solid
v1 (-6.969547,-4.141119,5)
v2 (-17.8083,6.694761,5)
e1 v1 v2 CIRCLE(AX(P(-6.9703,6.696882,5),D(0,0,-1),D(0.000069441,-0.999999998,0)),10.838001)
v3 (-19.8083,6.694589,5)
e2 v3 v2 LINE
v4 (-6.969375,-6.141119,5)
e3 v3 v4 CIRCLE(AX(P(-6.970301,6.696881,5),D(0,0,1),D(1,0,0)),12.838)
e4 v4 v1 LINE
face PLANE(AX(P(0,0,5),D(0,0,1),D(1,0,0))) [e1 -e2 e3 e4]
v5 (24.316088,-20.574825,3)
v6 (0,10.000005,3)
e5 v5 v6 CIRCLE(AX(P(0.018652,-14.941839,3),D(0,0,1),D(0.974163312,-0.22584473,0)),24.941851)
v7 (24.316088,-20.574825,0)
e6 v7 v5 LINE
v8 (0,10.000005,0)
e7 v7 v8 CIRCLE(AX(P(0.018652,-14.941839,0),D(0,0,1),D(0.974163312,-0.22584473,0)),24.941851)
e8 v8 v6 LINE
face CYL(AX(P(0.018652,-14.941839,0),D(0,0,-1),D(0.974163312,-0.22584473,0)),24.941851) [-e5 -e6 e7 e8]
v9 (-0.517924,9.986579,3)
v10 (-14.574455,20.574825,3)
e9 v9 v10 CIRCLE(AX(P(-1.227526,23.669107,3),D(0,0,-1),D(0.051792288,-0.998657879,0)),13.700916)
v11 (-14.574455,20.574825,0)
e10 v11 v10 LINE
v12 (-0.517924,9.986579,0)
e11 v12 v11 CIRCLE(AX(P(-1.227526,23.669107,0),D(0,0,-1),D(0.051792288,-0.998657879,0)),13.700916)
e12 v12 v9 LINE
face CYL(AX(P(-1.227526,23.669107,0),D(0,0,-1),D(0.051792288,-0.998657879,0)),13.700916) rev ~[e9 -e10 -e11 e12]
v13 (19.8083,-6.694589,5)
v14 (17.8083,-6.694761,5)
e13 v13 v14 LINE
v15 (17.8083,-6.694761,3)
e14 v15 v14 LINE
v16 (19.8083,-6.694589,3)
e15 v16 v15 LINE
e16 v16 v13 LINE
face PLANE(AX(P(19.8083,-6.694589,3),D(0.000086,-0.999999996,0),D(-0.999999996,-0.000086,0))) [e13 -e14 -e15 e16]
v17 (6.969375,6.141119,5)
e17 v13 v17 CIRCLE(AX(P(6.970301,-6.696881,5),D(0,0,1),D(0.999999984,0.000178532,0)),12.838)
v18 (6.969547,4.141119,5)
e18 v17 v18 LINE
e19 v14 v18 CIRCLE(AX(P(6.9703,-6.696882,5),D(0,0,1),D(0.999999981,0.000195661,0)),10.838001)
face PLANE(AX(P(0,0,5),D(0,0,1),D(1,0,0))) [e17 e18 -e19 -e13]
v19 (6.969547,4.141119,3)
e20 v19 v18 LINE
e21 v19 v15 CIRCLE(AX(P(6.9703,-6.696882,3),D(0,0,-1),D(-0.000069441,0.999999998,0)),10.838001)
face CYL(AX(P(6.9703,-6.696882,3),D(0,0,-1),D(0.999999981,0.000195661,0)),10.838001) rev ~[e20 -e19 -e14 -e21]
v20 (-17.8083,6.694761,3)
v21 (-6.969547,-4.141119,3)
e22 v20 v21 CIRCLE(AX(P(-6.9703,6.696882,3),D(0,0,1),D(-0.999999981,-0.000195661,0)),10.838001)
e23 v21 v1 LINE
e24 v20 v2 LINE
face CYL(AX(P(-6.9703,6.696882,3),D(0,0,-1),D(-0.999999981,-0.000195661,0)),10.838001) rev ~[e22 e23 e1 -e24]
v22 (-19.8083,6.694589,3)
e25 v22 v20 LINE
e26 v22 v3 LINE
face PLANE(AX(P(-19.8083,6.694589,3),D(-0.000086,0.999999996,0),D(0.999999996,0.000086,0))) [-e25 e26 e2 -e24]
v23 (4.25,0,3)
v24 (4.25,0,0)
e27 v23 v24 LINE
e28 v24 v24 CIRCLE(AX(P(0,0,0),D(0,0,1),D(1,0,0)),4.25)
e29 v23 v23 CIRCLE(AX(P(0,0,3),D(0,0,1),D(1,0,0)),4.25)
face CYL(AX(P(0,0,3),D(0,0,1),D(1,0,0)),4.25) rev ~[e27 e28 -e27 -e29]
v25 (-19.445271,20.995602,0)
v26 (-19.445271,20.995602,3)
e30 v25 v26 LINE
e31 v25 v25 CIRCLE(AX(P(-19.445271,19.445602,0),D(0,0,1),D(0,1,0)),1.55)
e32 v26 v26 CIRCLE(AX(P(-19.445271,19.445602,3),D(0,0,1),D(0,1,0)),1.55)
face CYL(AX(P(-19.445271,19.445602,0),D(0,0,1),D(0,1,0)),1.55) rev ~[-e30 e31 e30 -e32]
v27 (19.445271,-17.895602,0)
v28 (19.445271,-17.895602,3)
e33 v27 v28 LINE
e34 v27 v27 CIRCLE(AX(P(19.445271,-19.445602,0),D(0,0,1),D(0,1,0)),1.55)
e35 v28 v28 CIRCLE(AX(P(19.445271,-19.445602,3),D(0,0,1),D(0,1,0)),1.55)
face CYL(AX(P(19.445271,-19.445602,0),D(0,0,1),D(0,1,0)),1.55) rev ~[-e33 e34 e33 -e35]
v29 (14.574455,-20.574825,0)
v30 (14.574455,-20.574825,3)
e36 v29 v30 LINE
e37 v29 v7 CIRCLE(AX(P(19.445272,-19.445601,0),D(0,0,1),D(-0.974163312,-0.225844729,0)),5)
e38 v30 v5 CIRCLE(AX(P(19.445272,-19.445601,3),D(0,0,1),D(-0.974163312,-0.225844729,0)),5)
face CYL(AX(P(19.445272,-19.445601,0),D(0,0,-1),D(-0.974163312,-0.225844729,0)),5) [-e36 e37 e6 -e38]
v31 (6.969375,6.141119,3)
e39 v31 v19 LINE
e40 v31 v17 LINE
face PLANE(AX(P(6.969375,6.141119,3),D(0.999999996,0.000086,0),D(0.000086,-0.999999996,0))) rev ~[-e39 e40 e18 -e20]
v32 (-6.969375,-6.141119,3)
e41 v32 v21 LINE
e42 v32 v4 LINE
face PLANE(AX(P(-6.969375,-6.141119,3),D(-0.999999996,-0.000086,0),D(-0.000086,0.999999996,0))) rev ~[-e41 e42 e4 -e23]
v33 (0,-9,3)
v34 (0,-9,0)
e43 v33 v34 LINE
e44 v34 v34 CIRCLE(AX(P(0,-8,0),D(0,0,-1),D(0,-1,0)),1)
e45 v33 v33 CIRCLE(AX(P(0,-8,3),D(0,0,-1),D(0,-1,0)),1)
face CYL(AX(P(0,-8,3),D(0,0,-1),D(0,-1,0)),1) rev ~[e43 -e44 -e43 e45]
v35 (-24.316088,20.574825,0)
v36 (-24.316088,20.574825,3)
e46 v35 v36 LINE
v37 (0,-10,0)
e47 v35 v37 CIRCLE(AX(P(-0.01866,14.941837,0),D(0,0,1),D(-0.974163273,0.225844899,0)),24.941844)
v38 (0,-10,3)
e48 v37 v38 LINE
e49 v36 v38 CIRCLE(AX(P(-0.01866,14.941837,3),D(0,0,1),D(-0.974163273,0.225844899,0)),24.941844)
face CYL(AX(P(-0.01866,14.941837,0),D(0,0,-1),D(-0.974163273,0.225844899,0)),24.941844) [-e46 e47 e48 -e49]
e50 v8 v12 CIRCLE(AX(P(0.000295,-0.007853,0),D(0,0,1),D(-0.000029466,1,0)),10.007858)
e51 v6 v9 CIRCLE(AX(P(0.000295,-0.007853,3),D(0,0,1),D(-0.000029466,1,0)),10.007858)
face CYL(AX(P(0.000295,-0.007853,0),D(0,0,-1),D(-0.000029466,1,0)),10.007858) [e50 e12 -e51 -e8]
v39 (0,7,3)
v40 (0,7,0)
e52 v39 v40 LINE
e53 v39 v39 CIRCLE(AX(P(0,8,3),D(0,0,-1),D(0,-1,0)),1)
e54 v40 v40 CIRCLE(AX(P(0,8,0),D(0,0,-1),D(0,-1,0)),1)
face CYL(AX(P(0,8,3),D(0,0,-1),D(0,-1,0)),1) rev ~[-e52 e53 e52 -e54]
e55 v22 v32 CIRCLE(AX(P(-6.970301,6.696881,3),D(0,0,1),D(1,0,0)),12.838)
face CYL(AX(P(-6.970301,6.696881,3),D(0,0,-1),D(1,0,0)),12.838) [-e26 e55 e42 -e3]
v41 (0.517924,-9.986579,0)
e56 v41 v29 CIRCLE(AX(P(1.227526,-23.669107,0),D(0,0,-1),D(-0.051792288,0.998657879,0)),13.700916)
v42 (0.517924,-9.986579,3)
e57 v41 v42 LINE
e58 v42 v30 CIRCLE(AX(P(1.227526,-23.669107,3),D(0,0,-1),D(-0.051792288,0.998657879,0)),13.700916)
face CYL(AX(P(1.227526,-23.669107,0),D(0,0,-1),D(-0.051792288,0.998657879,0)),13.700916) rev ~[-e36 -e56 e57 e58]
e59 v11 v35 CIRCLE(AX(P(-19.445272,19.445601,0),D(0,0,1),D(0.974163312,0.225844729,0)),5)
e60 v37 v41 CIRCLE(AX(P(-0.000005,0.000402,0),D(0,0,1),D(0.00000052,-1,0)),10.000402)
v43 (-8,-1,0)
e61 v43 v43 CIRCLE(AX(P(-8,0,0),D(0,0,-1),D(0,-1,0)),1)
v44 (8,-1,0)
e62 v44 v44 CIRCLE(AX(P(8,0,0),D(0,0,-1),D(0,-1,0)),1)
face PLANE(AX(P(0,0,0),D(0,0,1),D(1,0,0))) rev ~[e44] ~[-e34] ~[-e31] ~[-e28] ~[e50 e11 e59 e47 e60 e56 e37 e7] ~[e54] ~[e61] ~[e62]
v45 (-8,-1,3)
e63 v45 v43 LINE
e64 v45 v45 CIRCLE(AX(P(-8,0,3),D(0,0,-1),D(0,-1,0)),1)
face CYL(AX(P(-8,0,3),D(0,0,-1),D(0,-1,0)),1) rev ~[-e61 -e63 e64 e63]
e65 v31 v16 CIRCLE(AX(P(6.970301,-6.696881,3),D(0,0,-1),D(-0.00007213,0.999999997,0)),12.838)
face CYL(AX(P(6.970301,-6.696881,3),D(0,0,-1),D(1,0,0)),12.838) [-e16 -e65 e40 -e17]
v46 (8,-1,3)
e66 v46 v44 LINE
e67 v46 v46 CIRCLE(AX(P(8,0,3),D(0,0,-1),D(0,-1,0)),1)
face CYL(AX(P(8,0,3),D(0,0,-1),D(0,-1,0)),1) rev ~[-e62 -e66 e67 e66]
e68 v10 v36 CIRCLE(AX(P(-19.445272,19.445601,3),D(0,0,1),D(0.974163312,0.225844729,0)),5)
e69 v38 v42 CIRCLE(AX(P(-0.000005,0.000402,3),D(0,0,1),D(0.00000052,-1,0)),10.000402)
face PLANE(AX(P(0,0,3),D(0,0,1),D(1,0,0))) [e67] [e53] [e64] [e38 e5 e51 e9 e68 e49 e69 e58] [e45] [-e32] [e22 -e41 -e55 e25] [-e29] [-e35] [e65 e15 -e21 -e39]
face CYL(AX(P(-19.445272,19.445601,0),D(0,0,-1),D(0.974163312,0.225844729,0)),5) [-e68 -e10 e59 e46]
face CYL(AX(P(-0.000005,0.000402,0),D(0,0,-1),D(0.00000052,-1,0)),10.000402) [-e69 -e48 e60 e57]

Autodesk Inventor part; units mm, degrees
ref_plane "YZ Plane" through (0, 0, 0) normal (1, 0, 0) x (0, 1, 0)
ref_plane "XZ Plane" through (0, 0, 0) normal (0, 1, 0) x (-1, 0, 0)
ref_plane "XY Plane" through (0, 0, 0) normal (0, 0, 1) x (1, 0, 0)
sketch "スケッチ1" plane through (0, 0, 0) normal (0, 0, 1) x (1, 0, 0)
  circle A0 centre (0, 0) radius 27.5
  line L0 (0, 27.5) -> (0, 0)
  line L1 (8, 0) -> (19.445271, -19.445602)
  line L2 (0, 0) -> (27.5, 0)
  circle A1 centre (19.445271, -19.445602) radius 5
  circle A2 centre (0, 0) radius 10
  arc A3 (24.316088, -20.574825) -> (0, 10.000005) centre (0.018653, -14.941839) ccw
  line L3 (24.316088, -20.574825) -> (14.574455, -20.574825)
  arc A4 (14.574455, -20.574825) -> (0.517924, -9.986579) centre (1.227526, -23.669106) ccw
  arc A5 (-24.316088, 20.574825) -> (0, -10.000005) centre (-0.018653, 14.941839) ccw
  arc A6 (-14.574455, 20.574825) -> (-0.517924, 9.986579) centre (-1.227526, 23.669106) ccw
  circle A7 centre (-19.445271, 19.445602) radius 5
  point P0 (-0.517924, 9.986579)
  point P1 (0, -10)
  point P2 (0, 10.000005)
  dimension "d4" = 20
  dimension "d0" = 55
  dimension "d1" = 8
  dimension "d2" = 22.56381
  dimension "d3" = 10
  dimension "d5" = 9.74163
  dimension "d9" = 360
sketch "スケッチ1 outline for 押し出し1" plane through (0, 0, 0) normal (0, 0, 1) x (1, 0, 0)
  arc A0 (14.574455, -20.574825) -> (24.316088, -20.574825) centre (19.445271, -19.445602) ccw
  arc A1 (24.316088, -20.574825) -> (0, 10.000005) centre (0.018653, -14.941839) ccw
  arc A2 (0, 10) -> (-0.517924, 9.986579) centre (0, 0) ccw
  arc A3 (-0.517924, 9.986579) -> (-14.574455, 20.574825) centre (-1.227526, 23.669106) cw
  arc A4 (-14.574455, 20.574825) -> (-24.316088, 20.574825) centre (-19.445271, 19.445602) ccw
  arc A5 (-24.316088, 20.574825) -> (0, -10) centre (-0.018659, 14.941837) ccw
  arc A6 (0, -10) -> (0.517924, -9.986579) centre (0, 0) ccw
  arc A7 (0.517924, -9.986579) -> (14.574455, -20.574825) centre (1.227526, -23.669106) cw
extrude "押し出し1" add sketch "スケッチ1 outline for 押し出し1" along normal blind 3
sketch "スケッチ2" plane through (0, 0, 3) normal (0, 0, 1) x (1, 0, 0)
  circle A0 centre (0, 0) radius 4.25
  dimension "d13" = 8.5
extrude "押し出し2" cut sketch "スケッチ2" against normal blind 3
sketch "スケッチ3" plane through (0, 0, 3) normal (0, 0, 1) x (1, 0, 0)
  arc A0 (-14.574455, 20.574825) -> (-24.316088, 20.574825) centre (-19.445271, 19.445602) ccw
  arc A1 (14.574455, -20.574825) -> (24.316088, -20.574825) centre (19.445271, -19.445602) ccw
  circle A2 centre (0, 0) radius 4.25
  point P0 (8, 0)
  point P1 (-8, 0)
  point P2 (0, 8)
  point P3 (-8, 0)
  point P4 (0, -8)
  dimension "d16" = 8
  dimension "d17" = 8
  dimension "d49" = 360
hole "穴1" at (-19.445271, 19.445602, 3) at (19.445271, -19.445602, 3) at (8, 0, 3) at (-8, 0, 3) at (0, 8, 3) at (0, -8, 3) direction (0, 0, -1) diameter 2 end through all
sketch "スケッチ4" plane through (0, 0, 3) normal (0, 0, 1) x (1, 0, 0)
  circle A0 centre (0, 0) radius 9.289
  circle A1 centre (8, 0) radius 1
  circle A2 centre (8, 0) radius 6.227
  circle A3 centre (0, 0) radius 8.107
  circle A4 centre (8, 0) radius 4.267399
  line L0 (6.969375, 6.141119) -> (6.969547, 4.141119)
  circle A5 centre (6.970301, -6.696881) radius 12.838
  circle A6 centre (0, 0) radius 20.909
  circle A7 centre (8, 0) radius 13.574
  line L1 (19.8083, -6.694589) -> (17.8083, -6.694761)
  arc A8 (17.8083, -6.694761) -> (6.969547, 4.141119) centre (6.970301, -6.696881) ccw
  circle A9 centre (-6.970301, 6.696881) radius 12.838
  line L2 (-19.8083, 6.694589) -> (-17.8083, 6.694761)
  arc A10 (-17.8083, 6.694761) -> (-6.969547, -4.141119) centre (-6.970301, 6.696881) ccw
  line L3 (-6.969375, -6.141119) -> (-6.969547, -4.141119)
  point P0 (6.969547, 4.141119)
  point P1 (-6.969547, -4.141119)
  dimension "d25" = 18.578
  dimension "d26" = 12.454
  dimension "d30" = 41.818
  dimension "d31" = 27.148
  dimension "d27" = 16.214
  dimension "d29" = 25.676
  dimension "d32" = 2
  dimension "d33" = 2
  dimension "d36" = 360
extrude "押し出し3" add sketch "スケッチ4" along normal blind 2 contours A8 A4 A0 | A0 A4 A8 | A4 L0 A0 | A0 A5 A2 A8 A4 | A2 A5 L1 A8 | A9 L2 A10 A0 | A0 A10 L3 picked at (7.717949, 4.165451) picked at (9.179473, 4.022297)
sketch "スケッチ5" plane through (0, 0, 0) normal (0, 0, -1) x (-1, 0, 0)
  circle A0 centre (19.445271, 19.445602) radius 1
  circle A1 centre (-19.445271, -19.445602) radius 1
  point P0 (0, 0)
hole "穴2" at (-19.445271, 19.445602, 0) at (19.445271, -19.445602, 0) direction (0, 0, 1) diameter 3.1 end through all
properties part number "rotor" material "アルミニウム 6061"
